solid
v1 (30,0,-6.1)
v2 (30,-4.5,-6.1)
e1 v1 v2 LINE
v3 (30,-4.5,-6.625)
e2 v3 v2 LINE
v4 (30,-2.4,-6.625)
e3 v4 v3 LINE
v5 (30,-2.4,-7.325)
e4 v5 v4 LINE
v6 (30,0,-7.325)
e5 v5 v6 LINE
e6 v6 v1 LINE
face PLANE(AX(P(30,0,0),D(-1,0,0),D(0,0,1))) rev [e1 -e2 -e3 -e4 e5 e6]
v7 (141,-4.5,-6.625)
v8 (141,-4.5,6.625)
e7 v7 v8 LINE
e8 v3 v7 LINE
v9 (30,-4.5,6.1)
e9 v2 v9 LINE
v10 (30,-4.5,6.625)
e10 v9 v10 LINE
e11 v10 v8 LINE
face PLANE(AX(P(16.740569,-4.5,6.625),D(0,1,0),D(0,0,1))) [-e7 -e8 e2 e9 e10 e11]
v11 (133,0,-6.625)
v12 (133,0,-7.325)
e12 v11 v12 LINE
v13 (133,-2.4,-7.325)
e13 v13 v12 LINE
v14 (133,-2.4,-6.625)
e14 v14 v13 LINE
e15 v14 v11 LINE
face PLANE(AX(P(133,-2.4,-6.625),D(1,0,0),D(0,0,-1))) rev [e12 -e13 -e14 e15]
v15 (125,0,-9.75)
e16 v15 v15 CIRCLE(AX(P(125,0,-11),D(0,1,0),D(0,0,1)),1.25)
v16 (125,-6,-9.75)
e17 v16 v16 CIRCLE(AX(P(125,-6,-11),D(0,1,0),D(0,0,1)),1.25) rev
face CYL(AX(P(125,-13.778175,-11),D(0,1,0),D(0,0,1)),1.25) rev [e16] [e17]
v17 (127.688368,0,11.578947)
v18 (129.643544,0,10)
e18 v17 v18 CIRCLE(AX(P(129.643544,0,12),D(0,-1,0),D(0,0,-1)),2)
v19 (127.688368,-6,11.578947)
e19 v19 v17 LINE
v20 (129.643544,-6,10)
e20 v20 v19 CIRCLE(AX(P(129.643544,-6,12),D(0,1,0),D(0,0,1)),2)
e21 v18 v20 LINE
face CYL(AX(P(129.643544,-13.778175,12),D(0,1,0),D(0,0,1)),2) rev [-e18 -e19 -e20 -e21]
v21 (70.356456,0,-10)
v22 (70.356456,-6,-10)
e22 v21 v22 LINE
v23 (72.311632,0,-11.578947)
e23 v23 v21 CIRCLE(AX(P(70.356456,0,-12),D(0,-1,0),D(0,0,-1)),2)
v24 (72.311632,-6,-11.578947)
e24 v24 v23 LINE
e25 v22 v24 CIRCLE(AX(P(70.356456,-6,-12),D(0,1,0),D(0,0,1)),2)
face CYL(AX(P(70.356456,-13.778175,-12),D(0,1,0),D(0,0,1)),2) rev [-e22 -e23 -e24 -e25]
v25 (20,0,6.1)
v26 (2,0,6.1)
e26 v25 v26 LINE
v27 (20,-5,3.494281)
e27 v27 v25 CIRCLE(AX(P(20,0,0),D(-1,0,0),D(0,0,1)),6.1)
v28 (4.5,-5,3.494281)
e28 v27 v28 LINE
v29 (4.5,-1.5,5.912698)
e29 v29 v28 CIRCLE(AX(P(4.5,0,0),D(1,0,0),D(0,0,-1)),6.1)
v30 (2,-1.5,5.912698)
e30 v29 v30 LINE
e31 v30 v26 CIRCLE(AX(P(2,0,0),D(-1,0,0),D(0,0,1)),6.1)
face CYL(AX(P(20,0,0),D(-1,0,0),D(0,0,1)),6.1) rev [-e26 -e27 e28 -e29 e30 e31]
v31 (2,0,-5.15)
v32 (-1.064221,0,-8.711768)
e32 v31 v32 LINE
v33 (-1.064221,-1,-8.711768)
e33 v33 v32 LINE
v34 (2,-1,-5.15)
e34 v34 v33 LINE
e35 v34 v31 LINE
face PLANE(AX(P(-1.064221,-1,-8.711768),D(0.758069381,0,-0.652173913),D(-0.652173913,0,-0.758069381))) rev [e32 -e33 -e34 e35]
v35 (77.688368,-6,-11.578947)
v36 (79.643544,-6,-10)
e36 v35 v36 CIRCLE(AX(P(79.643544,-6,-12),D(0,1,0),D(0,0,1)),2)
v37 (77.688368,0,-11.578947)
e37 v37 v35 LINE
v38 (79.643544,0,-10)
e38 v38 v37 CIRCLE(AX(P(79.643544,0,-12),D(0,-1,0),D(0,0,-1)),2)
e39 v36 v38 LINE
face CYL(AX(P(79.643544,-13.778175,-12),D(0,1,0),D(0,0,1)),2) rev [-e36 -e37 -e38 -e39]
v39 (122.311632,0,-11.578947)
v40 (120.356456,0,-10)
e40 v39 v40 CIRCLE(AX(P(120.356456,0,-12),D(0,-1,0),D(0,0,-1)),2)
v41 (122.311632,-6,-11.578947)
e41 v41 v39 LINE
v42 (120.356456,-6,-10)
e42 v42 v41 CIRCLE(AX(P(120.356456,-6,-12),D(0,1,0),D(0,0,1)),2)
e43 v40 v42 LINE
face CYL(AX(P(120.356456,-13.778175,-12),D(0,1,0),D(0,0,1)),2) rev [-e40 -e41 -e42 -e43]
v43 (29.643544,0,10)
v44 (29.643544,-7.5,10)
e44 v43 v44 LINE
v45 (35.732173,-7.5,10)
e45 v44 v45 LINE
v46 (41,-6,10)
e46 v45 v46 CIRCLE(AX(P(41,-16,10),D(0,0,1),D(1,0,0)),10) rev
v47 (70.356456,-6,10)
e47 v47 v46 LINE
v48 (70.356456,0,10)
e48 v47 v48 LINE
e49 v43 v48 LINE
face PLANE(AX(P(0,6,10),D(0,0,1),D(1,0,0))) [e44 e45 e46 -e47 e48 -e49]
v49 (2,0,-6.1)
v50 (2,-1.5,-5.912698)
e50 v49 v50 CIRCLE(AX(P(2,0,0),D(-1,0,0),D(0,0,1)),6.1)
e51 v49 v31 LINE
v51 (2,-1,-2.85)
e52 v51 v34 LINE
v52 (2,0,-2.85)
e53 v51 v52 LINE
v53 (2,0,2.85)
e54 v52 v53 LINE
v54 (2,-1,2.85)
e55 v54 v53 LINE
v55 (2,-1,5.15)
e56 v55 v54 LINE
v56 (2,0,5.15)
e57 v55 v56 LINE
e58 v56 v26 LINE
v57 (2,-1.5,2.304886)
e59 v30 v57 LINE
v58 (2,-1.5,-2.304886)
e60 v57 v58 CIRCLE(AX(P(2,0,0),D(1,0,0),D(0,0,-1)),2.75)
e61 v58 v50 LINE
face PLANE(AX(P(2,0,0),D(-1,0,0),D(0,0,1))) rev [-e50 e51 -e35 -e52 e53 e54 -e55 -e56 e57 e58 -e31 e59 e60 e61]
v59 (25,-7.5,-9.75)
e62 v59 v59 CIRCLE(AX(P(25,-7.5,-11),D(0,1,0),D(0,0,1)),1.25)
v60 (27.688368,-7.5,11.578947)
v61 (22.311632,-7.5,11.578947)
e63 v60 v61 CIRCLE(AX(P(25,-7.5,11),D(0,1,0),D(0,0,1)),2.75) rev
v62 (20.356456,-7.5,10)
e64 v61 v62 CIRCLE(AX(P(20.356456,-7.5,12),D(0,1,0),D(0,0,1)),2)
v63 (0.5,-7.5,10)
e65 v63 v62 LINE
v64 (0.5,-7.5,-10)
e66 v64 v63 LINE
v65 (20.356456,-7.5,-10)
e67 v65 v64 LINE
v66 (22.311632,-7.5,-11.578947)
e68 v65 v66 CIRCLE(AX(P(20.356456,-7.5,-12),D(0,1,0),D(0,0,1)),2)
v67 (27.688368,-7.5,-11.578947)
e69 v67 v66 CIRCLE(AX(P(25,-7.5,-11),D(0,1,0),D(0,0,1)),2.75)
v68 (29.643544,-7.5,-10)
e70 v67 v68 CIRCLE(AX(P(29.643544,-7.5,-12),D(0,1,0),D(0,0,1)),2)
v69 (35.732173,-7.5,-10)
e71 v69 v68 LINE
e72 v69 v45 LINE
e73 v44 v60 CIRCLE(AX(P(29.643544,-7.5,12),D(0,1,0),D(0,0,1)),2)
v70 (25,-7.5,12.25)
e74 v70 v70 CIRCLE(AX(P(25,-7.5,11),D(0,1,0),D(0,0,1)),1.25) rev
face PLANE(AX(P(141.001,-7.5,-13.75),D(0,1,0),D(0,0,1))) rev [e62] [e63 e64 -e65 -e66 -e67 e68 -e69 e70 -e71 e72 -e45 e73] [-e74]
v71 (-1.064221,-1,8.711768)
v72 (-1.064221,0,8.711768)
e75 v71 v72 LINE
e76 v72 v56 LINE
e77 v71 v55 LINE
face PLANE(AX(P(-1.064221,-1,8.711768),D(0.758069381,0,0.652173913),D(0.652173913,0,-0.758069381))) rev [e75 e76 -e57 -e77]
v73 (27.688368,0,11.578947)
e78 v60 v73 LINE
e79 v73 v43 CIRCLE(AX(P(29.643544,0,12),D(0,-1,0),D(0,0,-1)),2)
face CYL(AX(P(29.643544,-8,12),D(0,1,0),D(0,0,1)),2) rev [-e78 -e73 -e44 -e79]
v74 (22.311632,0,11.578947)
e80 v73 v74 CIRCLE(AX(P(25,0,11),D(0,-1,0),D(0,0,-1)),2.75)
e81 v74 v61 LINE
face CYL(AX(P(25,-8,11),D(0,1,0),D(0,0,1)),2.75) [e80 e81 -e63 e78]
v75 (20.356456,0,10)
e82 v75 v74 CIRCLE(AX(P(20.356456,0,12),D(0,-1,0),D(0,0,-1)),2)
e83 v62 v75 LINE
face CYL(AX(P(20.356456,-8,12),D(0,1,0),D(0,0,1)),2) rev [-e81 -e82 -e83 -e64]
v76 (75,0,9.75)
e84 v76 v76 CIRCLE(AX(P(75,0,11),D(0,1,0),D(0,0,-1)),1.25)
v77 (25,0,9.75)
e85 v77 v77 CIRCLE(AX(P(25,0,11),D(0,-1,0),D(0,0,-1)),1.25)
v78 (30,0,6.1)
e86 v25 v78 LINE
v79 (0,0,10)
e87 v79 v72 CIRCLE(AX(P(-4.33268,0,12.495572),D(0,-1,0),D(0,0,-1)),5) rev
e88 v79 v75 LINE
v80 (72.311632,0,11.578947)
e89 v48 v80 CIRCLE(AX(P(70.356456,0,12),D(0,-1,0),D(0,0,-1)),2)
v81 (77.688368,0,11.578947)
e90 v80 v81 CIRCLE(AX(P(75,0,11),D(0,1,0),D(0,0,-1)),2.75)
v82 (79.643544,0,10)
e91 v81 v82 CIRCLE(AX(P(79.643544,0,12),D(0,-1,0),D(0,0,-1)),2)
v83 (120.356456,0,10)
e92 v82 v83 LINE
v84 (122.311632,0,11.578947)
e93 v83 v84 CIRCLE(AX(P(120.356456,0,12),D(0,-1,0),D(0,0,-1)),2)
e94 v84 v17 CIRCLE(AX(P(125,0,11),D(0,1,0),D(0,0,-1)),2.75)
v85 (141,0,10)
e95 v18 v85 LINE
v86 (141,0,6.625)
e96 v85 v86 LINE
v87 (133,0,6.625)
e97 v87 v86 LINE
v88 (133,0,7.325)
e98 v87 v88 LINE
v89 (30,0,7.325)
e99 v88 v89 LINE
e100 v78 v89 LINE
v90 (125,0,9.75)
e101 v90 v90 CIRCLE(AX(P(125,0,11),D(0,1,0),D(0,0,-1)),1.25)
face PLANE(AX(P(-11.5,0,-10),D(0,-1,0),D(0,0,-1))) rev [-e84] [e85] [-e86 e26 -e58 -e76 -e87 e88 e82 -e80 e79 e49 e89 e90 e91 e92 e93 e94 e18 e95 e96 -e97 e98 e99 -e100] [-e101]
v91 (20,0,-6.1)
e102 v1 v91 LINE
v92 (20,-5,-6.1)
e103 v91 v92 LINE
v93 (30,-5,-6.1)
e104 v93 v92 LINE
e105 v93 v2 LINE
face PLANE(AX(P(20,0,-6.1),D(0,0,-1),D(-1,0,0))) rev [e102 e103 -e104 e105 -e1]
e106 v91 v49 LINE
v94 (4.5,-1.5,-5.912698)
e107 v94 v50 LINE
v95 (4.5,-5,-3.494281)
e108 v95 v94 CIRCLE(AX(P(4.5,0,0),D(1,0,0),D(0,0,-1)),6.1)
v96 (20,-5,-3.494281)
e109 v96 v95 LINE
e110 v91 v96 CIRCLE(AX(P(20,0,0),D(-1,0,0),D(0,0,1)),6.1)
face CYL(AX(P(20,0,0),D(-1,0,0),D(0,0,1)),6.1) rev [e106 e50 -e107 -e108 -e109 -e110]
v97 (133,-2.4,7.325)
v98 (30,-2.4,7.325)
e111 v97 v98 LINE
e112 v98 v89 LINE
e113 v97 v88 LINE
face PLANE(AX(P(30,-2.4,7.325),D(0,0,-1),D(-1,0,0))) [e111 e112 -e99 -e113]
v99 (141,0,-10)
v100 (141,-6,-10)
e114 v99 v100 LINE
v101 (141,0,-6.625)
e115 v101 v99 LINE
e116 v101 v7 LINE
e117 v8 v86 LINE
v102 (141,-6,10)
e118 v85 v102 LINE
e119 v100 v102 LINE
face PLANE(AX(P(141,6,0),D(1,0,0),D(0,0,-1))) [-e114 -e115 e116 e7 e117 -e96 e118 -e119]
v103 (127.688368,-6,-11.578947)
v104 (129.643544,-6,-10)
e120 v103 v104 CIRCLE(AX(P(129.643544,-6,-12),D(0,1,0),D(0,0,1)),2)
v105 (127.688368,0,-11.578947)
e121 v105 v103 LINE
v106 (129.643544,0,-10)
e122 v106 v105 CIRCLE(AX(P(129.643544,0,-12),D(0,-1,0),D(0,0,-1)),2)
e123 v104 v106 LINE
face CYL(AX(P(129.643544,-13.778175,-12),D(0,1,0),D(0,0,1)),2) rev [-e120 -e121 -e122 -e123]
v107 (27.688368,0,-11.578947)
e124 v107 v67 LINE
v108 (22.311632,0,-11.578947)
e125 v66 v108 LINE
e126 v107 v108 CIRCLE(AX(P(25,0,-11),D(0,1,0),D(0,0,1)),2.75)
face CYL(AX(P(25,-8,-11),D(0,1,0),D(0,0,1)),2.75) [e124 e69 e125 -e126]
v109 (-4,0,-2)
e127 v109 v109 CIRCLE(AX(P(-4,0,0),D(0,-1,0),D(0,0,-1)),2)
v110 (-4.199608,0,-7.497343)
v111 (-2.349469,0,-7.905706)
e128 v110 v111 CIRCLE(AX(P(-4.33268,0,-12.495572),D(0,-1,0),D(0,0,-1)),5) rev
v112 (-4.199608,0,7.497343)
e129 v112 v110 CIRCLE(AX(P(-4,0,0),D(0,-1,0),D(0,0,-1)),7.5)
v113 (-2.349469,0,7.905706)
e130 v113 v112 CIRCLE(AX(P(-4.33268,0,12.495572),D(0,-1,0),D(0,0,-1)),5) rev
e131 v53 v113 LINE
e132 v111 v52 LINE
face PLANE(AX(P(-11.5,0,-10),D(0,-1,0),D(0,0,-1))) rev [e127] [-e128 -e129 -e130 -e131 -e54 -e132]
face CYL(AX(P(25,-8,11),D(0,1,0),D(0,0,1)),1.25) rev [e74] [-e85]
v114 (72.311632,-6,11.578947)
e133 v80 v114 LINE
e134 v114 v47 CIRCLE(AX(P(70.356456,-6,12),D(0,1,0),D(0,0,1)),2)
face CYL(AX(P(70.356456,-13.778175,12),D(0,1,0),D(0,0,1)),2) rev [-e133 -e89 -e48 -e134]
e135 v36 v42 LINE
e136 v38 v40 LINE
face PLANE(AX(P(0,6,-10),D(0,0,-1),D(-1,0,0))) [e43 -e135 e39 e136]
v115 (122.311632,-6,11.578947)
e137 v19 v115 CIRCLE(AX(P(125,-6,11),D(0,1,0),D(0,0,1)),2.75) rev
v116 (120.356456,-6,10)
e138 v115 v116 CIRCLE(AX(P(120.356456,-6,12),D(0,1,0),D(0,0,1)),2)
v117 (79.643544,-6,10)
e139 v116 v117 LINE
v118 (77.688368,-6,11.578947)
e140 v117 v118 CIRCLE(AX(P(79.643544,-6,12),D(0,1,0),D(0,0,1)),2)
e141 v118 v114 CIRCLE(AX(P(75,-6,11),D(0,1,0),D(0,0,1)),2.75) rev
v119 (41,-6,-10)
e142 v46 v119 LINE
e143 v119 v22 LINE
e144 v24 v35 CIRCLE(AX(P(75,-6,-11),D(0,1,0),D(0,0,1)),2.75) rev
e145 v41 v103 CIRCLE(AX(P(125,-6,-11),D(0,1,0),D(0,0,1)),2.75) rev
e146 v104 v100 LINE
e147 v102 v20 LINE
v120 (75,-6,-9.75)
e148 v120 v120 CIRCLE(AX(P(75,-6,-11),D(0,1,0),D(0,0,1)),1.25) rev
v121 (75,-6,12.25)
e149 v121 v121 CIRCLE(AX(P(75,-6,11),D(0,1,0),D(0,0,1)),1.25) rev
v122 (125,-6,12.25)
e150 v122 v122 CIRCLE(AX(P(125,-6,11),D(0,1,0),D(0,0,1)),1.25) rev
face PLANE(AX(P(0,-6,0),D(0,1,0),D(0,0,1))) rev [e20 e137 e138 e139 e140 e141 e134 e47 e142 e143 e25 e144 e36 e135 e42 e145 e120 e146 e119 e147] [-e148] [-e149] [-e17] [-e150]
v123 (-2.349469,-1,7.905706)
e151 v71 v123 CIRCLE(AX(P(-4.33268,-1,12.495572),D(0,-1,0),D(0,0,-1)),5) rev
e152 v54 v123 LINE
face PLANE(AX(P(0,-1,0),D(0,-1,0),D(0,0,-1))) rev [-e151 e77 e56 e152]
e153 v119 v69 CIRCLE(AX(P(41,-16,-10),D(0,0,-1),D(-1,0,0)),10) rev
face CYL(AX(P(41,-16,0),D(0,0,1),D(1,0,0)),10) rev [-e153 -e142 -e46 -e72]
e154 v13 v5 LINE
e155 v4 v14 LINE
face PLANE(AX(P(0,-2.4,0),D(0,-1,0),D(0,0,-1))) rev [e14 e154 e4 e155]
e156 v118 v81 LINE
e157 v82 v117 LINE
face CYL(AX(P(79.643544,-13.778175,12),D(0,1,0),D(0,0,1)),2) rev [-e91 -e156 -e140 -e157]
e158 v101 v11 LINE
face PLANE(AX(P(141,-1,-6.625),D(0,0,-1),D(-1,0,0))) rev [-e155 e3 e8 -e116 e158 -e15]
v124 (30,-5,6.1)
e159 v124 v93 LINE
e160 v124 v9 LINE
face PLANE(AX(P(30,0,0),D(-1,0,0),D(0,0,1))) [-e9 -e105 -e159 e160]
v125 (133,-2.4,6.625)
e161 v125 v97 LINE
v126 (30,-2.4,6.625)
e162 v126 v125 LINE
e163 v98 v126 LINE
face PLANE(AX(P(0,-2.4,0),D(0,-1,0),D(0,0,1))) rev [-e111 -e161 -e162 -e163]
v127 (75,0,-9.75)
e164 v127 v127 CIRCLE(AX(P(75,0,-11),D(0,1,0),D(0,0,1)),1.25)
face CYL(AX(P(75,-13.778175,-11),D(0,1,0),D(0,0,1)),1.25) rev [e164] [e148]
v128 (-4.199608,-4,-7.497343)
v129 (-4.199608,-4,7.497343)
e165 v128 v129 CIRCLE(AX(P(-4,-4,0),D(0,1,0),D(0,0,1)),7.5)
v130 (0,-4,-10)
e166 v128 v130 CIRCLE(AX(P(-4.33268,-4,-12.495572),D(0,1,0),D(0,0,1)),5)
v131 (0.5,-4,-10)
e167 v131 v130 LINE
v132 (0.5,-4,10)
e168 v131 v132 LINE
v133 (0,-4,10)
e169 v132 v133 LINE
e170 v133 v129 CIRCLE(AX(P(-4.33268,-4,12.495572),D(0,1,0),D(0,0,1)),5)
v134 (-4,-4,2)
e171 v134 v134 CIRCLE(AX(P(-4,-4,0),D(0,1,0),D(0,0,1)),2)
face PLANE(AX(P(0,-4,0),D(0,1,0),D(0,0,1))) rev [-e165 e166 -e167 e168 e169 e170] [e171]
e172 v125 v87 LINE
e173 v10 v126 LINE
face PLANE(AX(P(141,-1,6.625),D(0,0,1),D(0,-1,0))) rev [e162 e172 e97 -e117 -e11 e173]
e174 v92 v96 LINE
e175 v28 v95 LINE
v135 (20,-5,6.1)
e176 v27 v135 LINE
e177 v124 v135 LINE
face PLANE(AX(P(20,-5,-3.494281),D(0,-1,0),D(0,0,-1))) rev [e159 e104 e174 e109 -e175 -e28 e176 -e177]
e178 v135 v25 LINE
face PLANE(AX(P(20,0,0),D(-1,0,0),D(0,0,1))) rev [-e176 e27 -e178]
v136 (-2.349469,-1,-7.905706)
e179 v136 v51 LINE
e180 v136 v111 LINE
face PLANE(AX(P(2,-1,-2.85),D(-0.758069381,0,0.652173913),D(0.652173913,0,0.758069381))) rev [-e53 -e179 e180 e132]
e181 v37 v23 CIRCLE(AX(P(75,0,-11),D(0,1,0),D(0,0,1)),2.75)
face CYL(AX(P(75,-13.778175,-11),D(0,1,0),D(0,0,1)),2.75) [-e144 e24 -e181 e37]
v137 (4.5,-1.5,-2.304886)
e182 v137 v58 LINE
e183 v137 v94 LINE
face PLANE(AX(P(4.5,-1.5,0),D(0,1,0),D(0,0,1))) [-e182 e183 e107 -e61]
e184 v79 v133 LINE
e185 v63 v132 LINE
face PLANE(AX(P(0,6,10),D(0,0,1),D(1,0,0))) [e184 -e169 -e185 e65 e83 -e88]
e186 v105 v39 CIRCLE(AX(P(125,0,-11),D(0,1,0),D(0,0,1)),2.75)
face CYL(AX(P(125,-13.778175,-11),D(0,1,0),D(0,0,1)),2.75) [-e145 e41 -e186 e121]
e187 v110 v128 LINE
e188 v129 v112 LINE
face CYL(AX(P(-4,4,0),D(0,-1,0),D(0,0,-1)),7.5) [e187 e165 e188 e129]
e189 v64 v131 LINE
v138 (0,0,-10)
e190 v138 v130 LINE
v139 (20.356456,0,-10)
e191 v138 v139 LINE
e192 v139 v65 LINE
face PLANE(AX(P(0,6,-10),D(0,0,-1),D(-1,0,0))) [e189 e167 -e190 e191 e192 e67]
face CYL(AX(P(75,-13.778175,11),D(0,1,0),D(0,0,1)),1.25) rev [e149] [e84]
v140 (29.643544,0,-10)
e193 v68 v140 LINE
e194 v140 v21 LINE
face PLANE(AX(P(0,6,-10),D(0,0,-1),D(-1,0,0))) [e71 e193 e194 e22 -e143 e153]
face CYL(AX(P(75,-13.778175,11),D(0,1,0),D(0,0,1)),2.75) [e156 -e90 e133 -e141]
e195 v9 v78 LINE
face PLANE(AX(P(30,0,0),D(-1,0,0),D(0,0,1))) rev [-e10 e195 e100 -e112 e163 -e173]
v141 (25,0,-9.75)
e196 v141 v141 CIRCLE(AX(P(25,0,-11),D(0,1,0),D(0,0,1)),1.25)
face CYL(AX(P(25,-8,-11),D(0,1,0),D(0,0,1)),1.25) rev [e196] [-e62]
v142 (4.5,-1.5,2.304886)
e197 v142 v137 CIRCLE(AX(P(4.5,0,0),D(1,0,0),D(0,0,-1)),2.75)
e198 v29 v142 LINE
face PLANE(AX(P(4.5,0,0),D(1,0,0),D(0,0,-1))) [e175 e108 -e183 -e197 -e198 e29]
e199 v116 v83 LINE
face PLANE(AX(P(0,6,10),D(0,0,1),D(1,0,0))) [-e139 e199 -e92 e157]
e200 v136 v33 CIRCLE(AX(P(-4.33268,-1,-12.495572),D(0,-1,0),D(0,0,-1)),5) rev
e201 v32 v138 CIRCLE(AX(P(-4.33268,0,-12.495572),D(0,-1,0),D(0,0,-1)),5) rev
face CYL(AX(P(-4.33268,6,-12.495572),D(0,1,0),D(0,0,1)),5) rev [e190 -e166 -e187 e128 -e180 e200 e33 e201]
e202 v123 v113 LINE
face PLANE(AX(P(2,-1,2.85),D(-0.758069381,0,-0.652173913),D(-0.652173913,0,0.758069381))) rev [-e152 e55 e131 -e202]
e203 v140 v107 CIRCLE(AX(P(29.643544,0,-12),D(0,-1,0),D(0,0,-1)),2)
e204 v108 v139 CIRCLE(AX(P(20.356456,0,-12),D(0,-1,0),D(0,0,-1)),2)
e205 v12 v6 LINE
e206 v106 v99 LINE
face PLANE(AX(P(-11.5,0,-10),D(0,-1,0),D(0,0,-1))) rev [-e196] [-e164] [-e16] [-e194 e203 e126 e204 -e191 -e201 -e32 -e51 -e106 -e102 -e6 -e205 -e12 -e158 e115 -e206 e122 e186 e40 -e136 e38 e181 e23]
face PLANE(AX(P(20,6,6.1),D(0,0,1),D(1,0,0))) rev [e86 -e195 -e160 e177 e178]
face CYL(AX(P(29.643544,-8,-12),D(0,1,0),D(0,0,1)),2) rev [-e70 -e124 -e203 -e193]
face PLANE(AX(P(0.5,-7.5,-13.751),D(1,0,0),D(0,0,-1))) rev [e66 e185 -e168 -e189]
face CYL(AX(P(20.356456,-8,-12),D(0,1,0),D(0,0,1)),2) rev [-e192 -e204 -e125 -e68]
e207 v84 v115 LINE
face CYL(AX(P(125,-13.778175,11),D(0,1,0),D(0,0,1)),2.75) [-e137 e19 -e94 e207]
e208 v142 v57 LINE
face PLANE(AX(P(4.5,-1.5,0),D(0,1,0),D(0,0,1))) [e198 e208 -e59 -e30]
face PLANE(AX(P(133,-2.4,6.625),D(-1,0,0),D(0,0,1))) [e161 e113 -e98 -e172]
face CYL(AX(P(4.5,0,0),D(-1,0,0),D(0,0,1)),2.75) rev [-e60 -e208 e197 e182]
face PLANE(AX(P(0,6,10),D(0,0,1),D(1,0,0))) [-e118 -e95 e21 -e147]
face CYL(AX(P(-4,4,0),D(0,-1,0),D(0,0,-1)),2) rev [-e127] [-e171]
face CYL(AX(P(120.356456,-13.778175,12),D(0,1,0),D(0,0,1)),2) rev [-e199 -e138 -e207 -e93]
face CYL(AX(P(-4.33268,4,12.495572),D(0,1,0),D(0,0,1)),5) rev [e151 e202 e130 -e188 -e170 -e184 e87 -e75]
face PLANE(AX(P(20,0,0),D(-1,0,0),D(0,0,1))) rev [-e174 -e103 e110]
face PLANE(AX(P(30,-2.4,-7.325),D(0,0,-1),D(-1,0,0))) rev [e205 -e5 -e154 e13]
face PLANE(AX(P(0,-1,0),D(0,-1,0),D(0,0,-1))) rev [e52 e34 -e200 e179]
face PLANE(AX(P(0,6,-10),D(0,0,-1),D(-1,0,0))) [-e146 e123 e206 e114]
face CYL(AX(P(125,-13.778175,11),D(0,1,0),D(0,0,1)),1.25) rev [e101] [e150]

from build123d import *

# Parameters (mm, degrees)
SKETCH1_R                = 2
BOSS_EXTRUDE1_DEPTH      = 4
BOSS_EXTRUDE2_DEPTH      = 6
CUT_EXTRUDE1_START       = -2
CUT_EXTRUDE1_DEPTH       = 18
SKETCH4_W                = 12.2
SKETCH4_H                = 11
CUT_EXTRUDE2_DEPTH       = 10
SKETCH5_W                = 20
SKETCH5_H                = 2
BOSS_EXTRUDE3_DEPTH      = 35
CUT_EXTRUDE7_DEPTH       = 112.736296699
SKETCH14_W               = 20
SKETCH14_H               = 2
CUT_EXTRUDE8_DEPTH       = 142.58036587
FILLET2_R                = 10
FILLET3_R                = 5
CUT_EXTRUDE10_DEPTH      = 142.58036587
CUT_EXTRUDE10_DEPTH_BACK = 142.58036587
SKETCH20_W               = 20
SKETCH20_H               = 4
BOSS_EXTRUDE5_DEPTH      = 2.5
CUT_EXTRUDE11_DEPTH      = 1
SKETCH26_W               = 13.25
SKETCH26_H               = 0.5
BOSS_EXTRUDE6_DEPTH      = 111
SKETCH31_R               = 2.75
SKETCH31_R_2             = 1.25
BOSS_EXTRUDE8_DEPTH      = 8
SKETCH31_5_R             = 2.75
SKETCH31_5_R_2           = 1.25
BOSS_EXTRUDE9_DEPTH      = 6
SKETCH33_R               = 1.25
CUT_EXTRUDE12_DEPTH      = 142.894547112
FILLET4_R                = 2
SKETCH34_W               = 103
SKETCH34_H               = 0.7
CUT_EXTRUDE13_DEPTH      = 2.4
CUT_EXTRUDE14_REACH      = 143.895
SKETCH35_W               = 27.5
SKETCH35_H               = 0.5
CUT_EXTRUDE15_REACH      = 145.183
SKETCH36_W               = 0.5
SKETCH36_H               = 3.5


with BuildPart() as part:
    # Sketch1 → Boss-Extrude1 (new, symmetric)
    with BuildSketch(Plane(origin=(0, 0, 0), x_dir=(1, 0, 0), z_dir=(0, 1, 0))):
        with BuildLine():
            ThreePointArc((-4, 7.5), (-11.5, 0), (-4, -7.5))
            Line((-4, -7.5), (0, -7.5))
            Line((0, -7.5), (0, 7.5))
            Line((0, 7.5), (-4, 7.5))
        make_face()
        with Locations(Location((-4, 0, 0), (0, 0, 270))):
            Circle(SKETCH1_R, mode=Mode.SUBTRACT)
    extrude(amount=BOSS_EXTRUDE1_DEPTH, both=True)

    # Sketch1<3> → Boss-Extrude2 (add, symmetric)
    with BuildSketch(Plane(origin=(0, 0, 0), x_dir=(1, 0, 0), z_dir=(0, 1, 0))):
        Polygon((0, 10), (0, 7.5), (0, 0), (141, 0), (141, 10), align=None)
        Polygon((0, 0), (0, -7.5), (0, -10), (141, -10), (141, 0), align=None)
    extrude(amount=BOSS_EXTRUDE2_DEPTH, both=True)

    # Sketch3 → Cut-Extrude1 (cut)
    with BuildSketch(Plane.ZY.offset(CUT_EXTRUDE1_START)):
        with BuildLine():
            Line((-3.494281042, -5), (3.494281042, -5))
            ThreePointArc((3.494281042, -5), (5.4094877, -2.819120931), (6.1, 0))
            Line((6.1, 0), (6.1, 6))
            Line((6.1, 6), (-6.1, 6))
            Line((-6.1, 6), (-6.1, 0))
            ThreePointArc((-6.1, 0), (-5.4094877, -2.819120931), (-3.494281042, -5))
        make_face()
    extrude(amount=-CUT_EXTRUDE1_DEPTH, mode=Mode.SUBTRACT)

    # Sketch4 → Cut-Extrude2 (cut)
    with BuildSketch(Plane.ZY.offset(-20)):
        with Locations((0, 0.5)):
            Rectangle(SKETCH4_W, SKETCH4_H)
    extrude(amount=-CUT_EXTRUDE2_DEPTH, mode=Mode.SUBTRACT)

    # Sketch5 → Boss-Extrude3 (add)
    with BuildSketch(Plane.ZY):
        with Locations((0, -7)):
            Rectangle(SKETCH5_W, SKETCH5_H)
    extrude(amount=-BOSS_EXTRUDE3_DEPTH)

    # Sketch13 → Cut-Extrude7 (cut, through all)
    with BuildSketch(Plane.ZY.offset(-30)):
        Polygon((-6.625, 5), (-6.625, -1), (-6.625, -5), (6.625, -5), (6.625, -1), (6.625, 5), align=None)
    extrude(amount=-CUT_EXTRUDE7_DEPTH, mode=Mode.SUBTRACT)

    # Sketch14 → Cut-Extrude8 (cut, through all)
    with BuildSketch(Plane.ZY):
        with Locations((0, 5)):
            Rectangle(SKETCH14_W, SKETCH14_H)
    extrude(amount=-CUT_EXTRUDE8_DEPTH, mode=Mode.SUBTRACT)

    # Fillet2
    # the kernel refuses this fillet: 10 mm, written as the material it adds along each edge
    with BuildSketch(Plane(origin=(35, -6, -10), x_dir=(1, 0, 0), z_dir=(0, 0, 1))) as fillet2_piece_1:
        with BuildLine():
            CenterArc((6, -10), FILLET2_R, 90, 36.869897646)
            Line((0, -2), (-0.12, -1.84))
            ThreePointArc((-0.12, -1.84), (-0.2, -1), (-0.2, 0))
            Line((-0.2, 0), (0, 0.2))
            Line((0, 0.2), (6, 0.2))
            Line((6, 0.2), (6, 0))
        make_face()
    extrude(amount=20)

    # Fillet3
    # the kernel refuses this fillet: 5 mm, written as the material it adds along each edge
    with BuildSketch(Plane(origin=(0, -4, 7.5), x_dir=(0, 0, 1), z_dir=(0, 1, 0))) as fillet3_piece_1:
        with BuildLine():
            CenterArc((4.995572165, -4.332680414), FILLET3_R, 119.941428639, 58.533496592)
            Line((-0.002656701, -4.199608248), (-0.502479587, -4.186301032))
            ThreePointArc((-0.502479587, -4.186301032), (-0.5, -4), (-0.5, 0))
            Line((-0.5, 0), (0, 0.5))
            ThreePointArc((0, 0.5), (1.25, 0.5), (2.250442783, 0.433268041))
            Line((2.250442783, 0.433268041), (2.5, 0))
        make_face()
    extrude(amount=8)
    with BuildSketch(Plane(origin=(0, -4, -7.5), x_dir=(0, 0, -1), z_dir=(0, 1, 0))) as fillet3_piece_2:
        with BuildLine():
            CenterArc((4.995572165, 4.332680414), FILLET3_R, 181.525074769, 58.533496592)
            Line((-0.002656701, 4.199608248), (-0.502479587, 4.186301032))
            ThreePointArc((-0.502479587, 4.186301032), (-0.5, 4), (-0.5, 0))
            Line((-0.5, 0), (0, -0.5))
            ThreePointArc((0, -0.5), (1.25, -0.5), (2.250442783, -0.433268041))
            Line((2.250442783, -0.433268041), (2.5, 0))
        make_face()
    extrude(amount=8)

    # Sketch20 → Cut-Extrude10 (cut, two sides: drawn at the far end of the back side and taken through both)
    with BuildSketch(Plane(origin=(0, 0, 0), x_dir=(0, 0, -1), z_dir=(1, 0, 0)).offset(-CUT_EXTRUDE10_DEPTH_BACK)):
        with Locations((0, 2)):
            Rectangle(SKETCH20_W, SKETCH20_H)
    extrude(amount=CUT_EXTRUDE10_DEPTH + CUT_EXTRUDE10_DEPTH_BACK, mode=Mode.SUBTRACT)

    # Sketch16 → Boss-Extrude5 (add)
    with BuildSketch(Plane(origin=(2, 0, 0), x_dir=(0, 0, -1), z_dir=(1, 0, 0))):
        with BuildLine():
            Line((-2.304886114, -1.5), (-5.9126982, -1.5))
            ThreePointArc((-5.9126982, -1.5), (-5.018497246, -3.467662813), (-3.494281042, -5))
            Line((-3.494281042, -5), (3.494281042, -5))
            ThreePointArc((3.494281042, -5), (5.018497246, -3.467662813), (5.9126982, -1.5))
            Line((5.9126982, -1.5), (2.304886114, -1.5))
            ThreePointArc((2.304886114, -1.5), (0, -2.75), (-2.304886114, -1.5))
        make_face()
    extrude(amount=BOSS_EXTRUDE5_DEPTH)

    # Sketch22 → Cut-Extrude11 (cut)
    with BuildSketch(Plane(origin=(0, 0, 0), x_dir=(1, 0, 0), z_dir=(0, 1, 0))):
        Polygon((2, 5.15), (2, 2.85), (-2.349469206, 7.905705794), (-1.064221101, 8.711768032), align=None)
        Polygon((2, -5.15), (2, -2.85), (-2.349469206, -7.905705794), (-1.064221101, -8.711768032), align=None)
    extrude(amount=-CUT_EXTRUDE11_DEPTH, mode=Mode.SUBTRACT)

    # Sketch26 → Boss-Extrude6 (add)
    with BuildSketch(Plane(origin=(141, 0, 0), x_dir=(0, 0, -1), z_dir=(1, 0, 0))):
        with Locations((0, -4.75)):
            Rectangle(SKETCH26_W, SKETCH26_H)
    extrude(amount=-BOSS_EXTRUDE6_DEPTH)

    # Sketch31 → Boss-Extrude8 (add, through all)
    # profile 1 of 2: a face of its own
    with BuildSketch(Plane(origin=(0, 0, 0), x_dir=(1, 0, 0), z_dir=(0, 1, 0))):
        with Locations((25, 11)):
            Circle(SKETCH31_R)
        with Locations((25, 11)):
            Circle(SKETCH31_R_2, mode=Mode.SUBTRACT)
    # profile 2 of 2: a face of its own
    with BuildSketch(Plane(origin=(0, 0, 0), x_dir=(1, 0, 0), z_dir=(0, 1, 0))):
        with Locations((25, -11)):
            Circle(SKETCH31_R)
        with Locations((25, -11)):
            Circle(SKETCH31_R_2, mode=Mode.SUBTRACT)
    extrude(amount=-BOSS_EXTRUDE8_DEPTH)

    # Sketch31<5> → Boss-Extrude9 (add)
    # profile 1 of 6: a face of its own
    with BuildSketch(Plane(origin=(0, 0, 0), x_dir=(1, 0, 0), z_dir=(0, 1, 0))):
        with Locations((25, 11)):
            Circle(SKETCH31_5_R)
        with Locations((25, 11)):
            Circle(SKETCH31_5_R_2, mode=Mode.SUBTRACT)
    # profile 2 of 6: a face of its own
    with BuildSketch(Plane(origin=(0, 0, 0), x_dir=(1, 0, 0), z_dir=(0, 1, 0))):
        with Locations((75, 11)):
            Circle(SKETCH31_5_R)
        with Locations((75, 11)):
            Circle(SKETCH31_5_R_2, mode=Mode.SUBTRACT)
    # profile 3 of 6: a face of its own
    with BuildSketch(Plane(origin=(0, 0, 0), x_dir=(1, 0, 0), z_dir=(0, 1, 0))):
        with Locations((125, 11)):
            Circle(SKETCH31_5_R)
        with Locations((125, 11)):
            Circle(SKETCH31_5_R_2, mode=Mode.SUBTRACT)
    # profile 4 of 6: a face of its own
    with BuildSketch(Plane(origin=(0, 0, 0), x_dir=(1, 0, 0), z_dir=(0, 1, 0))):
        with Locations((125, -11)):
            Circle(SKETCH31_5_R)
        with Locations((125, -11)):
            Circle(SKETCH31_5_R_2, mode=Mode.SUBTRACT)
    # profile 5 of 6: a face of its own
    with BuildSketch(Plane(origin=(0, 0, 0), x_dir=(1, 0, 0), z_dir=(0, 1, 0))):
        with Locations((75, -11)):
            Circle(SKETCH31_5_R)
        with Locations((75, -11)):
            Circle(SKETCH31_5_R_2, mode=Mode.SUBTRACT)
    # profile 6 of 6: a face of its own
    with BuildSketch(Plane(origin=(0, 0, 0), x_dir=(1, 0, 0), z_dir=(0, 1, 0))):
        with Locations((25, -11)):
            Circle(SKETCH31_5_R)
        with Locations((25, -11)):
            Circle(SKETCH31_5_R_2, mode=Mode.SUBTRACT)
    extrude(amount=-BOSS_EXTRUDE9_DEPTH)

    # Sketch33 → Cut-Extrude12 (cut, through all)
    with BuildSketch(Plane(origin=(0, 0, 0), x_dir=(1, 0, 0), z_dir=(0, 1, 0))):
        with Locations(Location((25, 11, 0), (0, 0, 270))):
            Circle(SKETCH33_R)
        with Locations(Location((75, 11, 0), (0, 0, 270))):
            Circle(SKETCH33_R)
        with Locations(Location((75, -11, 0), (0, 0, 270))):
            Circle(SKETCH33_R)
        with Locations(Location((25, -11, 0), (0, 0, 90))):
            Circle(SKETCH33_R)
        with Locations(Location((125, 11, 0), (0, 0, 270))):
            Circle(SKETCH33_R)
        with Locations(Location((125, -11, 0), (0, 0, 270))):
            Circle(SKETCH33_R)
    extrude(amount=-CUT_EXTRUDE12_DEPTH, mode=Mode.SUBTRACT)

    # Fillet4
    fillet4_edges = [part.edges().sort_by_distance(p)[0] for p in [
        (27.561737691, -4, 10),
        (22.438262309, -4, 10),
        (22.438262309, -4, -10),
        (27.561737691, -4, -10),
        (72.438262309, -3, -10),
        (77.561737691, -3, -10),
        (122.438262309, -3, -10),
        (127.561737691, -3, -10),
        (127.561737691, -3, 10),
        (122.438262309, -3, 10),
        (77.561737691, -3, 10),
        (72.438262309, -3, 10),
    ]]
    fillet(fillet4_edges, radius=FILLET4_R)

    # Sketch34 → Cut-Extrude13 (cut)
    with BuildSketch(Plane(origin=(0, 0, 0), x_dir=(1, 0, 0), z_dir=(0, 1, 0))):
        with Locations((81.5, 6.975)):
            Rectangle(SKETCH34_W, SKETCH34_H)
    cut_extrude13 = extrude(amount=-CUT_EXTRUDE13_DEPTH, mode=Mode.SUBTRACT)

    # Mirror1: Cut-Extrude13 across plane
    add(cut_extrude13.mirror(Plane.XY), mode=Mode.SUBTRACT)

    # Sketch35 → Cut-Extrude14 (cut, up to next)
    with BuildSketch(Plane.ZY, mode=Mode.PRIVATE) as cut_extrude14_sk1:
        with Locations((0, -7.75)):
            Rectangle(SKETCH35_W, SKETCH35_H)
    cut_extrude14_tool1 = extrude(cut_extrude14_sk1.sketch, amount=-CUT_EXTRUDE14_REACH, mode=Mode.PRIVATE) & part.part
    add(cut_extrude14_tool1.solids().sort_by_distance((0, -7.75, 0))[0], mode=Mode.SUBTRACT)

    # Sketch36 → Cut-Extrude15 (cut, up to next)
    with BuildSketch(Plane.XY.offset(10), mode=Mode.PRIVATE) as cut_extrude15_sk1:
        with Locations((0.25, -5.75)):
            Rectangle(SKETCH36_W, SKETCH36_H)
    cut_extrude15_tool1 = extrude(cut_extrude15_sk1.sketch, amount=-CUT_EXTRUDE15_REACH, mode=Mode.PRIVATE) & part.part
    add(cut_extrude15_tool1.solids().sort_by_distance((0.25, -5.75, 10))[0], mode=Mode.SUBTRACT)


solid = part.part
